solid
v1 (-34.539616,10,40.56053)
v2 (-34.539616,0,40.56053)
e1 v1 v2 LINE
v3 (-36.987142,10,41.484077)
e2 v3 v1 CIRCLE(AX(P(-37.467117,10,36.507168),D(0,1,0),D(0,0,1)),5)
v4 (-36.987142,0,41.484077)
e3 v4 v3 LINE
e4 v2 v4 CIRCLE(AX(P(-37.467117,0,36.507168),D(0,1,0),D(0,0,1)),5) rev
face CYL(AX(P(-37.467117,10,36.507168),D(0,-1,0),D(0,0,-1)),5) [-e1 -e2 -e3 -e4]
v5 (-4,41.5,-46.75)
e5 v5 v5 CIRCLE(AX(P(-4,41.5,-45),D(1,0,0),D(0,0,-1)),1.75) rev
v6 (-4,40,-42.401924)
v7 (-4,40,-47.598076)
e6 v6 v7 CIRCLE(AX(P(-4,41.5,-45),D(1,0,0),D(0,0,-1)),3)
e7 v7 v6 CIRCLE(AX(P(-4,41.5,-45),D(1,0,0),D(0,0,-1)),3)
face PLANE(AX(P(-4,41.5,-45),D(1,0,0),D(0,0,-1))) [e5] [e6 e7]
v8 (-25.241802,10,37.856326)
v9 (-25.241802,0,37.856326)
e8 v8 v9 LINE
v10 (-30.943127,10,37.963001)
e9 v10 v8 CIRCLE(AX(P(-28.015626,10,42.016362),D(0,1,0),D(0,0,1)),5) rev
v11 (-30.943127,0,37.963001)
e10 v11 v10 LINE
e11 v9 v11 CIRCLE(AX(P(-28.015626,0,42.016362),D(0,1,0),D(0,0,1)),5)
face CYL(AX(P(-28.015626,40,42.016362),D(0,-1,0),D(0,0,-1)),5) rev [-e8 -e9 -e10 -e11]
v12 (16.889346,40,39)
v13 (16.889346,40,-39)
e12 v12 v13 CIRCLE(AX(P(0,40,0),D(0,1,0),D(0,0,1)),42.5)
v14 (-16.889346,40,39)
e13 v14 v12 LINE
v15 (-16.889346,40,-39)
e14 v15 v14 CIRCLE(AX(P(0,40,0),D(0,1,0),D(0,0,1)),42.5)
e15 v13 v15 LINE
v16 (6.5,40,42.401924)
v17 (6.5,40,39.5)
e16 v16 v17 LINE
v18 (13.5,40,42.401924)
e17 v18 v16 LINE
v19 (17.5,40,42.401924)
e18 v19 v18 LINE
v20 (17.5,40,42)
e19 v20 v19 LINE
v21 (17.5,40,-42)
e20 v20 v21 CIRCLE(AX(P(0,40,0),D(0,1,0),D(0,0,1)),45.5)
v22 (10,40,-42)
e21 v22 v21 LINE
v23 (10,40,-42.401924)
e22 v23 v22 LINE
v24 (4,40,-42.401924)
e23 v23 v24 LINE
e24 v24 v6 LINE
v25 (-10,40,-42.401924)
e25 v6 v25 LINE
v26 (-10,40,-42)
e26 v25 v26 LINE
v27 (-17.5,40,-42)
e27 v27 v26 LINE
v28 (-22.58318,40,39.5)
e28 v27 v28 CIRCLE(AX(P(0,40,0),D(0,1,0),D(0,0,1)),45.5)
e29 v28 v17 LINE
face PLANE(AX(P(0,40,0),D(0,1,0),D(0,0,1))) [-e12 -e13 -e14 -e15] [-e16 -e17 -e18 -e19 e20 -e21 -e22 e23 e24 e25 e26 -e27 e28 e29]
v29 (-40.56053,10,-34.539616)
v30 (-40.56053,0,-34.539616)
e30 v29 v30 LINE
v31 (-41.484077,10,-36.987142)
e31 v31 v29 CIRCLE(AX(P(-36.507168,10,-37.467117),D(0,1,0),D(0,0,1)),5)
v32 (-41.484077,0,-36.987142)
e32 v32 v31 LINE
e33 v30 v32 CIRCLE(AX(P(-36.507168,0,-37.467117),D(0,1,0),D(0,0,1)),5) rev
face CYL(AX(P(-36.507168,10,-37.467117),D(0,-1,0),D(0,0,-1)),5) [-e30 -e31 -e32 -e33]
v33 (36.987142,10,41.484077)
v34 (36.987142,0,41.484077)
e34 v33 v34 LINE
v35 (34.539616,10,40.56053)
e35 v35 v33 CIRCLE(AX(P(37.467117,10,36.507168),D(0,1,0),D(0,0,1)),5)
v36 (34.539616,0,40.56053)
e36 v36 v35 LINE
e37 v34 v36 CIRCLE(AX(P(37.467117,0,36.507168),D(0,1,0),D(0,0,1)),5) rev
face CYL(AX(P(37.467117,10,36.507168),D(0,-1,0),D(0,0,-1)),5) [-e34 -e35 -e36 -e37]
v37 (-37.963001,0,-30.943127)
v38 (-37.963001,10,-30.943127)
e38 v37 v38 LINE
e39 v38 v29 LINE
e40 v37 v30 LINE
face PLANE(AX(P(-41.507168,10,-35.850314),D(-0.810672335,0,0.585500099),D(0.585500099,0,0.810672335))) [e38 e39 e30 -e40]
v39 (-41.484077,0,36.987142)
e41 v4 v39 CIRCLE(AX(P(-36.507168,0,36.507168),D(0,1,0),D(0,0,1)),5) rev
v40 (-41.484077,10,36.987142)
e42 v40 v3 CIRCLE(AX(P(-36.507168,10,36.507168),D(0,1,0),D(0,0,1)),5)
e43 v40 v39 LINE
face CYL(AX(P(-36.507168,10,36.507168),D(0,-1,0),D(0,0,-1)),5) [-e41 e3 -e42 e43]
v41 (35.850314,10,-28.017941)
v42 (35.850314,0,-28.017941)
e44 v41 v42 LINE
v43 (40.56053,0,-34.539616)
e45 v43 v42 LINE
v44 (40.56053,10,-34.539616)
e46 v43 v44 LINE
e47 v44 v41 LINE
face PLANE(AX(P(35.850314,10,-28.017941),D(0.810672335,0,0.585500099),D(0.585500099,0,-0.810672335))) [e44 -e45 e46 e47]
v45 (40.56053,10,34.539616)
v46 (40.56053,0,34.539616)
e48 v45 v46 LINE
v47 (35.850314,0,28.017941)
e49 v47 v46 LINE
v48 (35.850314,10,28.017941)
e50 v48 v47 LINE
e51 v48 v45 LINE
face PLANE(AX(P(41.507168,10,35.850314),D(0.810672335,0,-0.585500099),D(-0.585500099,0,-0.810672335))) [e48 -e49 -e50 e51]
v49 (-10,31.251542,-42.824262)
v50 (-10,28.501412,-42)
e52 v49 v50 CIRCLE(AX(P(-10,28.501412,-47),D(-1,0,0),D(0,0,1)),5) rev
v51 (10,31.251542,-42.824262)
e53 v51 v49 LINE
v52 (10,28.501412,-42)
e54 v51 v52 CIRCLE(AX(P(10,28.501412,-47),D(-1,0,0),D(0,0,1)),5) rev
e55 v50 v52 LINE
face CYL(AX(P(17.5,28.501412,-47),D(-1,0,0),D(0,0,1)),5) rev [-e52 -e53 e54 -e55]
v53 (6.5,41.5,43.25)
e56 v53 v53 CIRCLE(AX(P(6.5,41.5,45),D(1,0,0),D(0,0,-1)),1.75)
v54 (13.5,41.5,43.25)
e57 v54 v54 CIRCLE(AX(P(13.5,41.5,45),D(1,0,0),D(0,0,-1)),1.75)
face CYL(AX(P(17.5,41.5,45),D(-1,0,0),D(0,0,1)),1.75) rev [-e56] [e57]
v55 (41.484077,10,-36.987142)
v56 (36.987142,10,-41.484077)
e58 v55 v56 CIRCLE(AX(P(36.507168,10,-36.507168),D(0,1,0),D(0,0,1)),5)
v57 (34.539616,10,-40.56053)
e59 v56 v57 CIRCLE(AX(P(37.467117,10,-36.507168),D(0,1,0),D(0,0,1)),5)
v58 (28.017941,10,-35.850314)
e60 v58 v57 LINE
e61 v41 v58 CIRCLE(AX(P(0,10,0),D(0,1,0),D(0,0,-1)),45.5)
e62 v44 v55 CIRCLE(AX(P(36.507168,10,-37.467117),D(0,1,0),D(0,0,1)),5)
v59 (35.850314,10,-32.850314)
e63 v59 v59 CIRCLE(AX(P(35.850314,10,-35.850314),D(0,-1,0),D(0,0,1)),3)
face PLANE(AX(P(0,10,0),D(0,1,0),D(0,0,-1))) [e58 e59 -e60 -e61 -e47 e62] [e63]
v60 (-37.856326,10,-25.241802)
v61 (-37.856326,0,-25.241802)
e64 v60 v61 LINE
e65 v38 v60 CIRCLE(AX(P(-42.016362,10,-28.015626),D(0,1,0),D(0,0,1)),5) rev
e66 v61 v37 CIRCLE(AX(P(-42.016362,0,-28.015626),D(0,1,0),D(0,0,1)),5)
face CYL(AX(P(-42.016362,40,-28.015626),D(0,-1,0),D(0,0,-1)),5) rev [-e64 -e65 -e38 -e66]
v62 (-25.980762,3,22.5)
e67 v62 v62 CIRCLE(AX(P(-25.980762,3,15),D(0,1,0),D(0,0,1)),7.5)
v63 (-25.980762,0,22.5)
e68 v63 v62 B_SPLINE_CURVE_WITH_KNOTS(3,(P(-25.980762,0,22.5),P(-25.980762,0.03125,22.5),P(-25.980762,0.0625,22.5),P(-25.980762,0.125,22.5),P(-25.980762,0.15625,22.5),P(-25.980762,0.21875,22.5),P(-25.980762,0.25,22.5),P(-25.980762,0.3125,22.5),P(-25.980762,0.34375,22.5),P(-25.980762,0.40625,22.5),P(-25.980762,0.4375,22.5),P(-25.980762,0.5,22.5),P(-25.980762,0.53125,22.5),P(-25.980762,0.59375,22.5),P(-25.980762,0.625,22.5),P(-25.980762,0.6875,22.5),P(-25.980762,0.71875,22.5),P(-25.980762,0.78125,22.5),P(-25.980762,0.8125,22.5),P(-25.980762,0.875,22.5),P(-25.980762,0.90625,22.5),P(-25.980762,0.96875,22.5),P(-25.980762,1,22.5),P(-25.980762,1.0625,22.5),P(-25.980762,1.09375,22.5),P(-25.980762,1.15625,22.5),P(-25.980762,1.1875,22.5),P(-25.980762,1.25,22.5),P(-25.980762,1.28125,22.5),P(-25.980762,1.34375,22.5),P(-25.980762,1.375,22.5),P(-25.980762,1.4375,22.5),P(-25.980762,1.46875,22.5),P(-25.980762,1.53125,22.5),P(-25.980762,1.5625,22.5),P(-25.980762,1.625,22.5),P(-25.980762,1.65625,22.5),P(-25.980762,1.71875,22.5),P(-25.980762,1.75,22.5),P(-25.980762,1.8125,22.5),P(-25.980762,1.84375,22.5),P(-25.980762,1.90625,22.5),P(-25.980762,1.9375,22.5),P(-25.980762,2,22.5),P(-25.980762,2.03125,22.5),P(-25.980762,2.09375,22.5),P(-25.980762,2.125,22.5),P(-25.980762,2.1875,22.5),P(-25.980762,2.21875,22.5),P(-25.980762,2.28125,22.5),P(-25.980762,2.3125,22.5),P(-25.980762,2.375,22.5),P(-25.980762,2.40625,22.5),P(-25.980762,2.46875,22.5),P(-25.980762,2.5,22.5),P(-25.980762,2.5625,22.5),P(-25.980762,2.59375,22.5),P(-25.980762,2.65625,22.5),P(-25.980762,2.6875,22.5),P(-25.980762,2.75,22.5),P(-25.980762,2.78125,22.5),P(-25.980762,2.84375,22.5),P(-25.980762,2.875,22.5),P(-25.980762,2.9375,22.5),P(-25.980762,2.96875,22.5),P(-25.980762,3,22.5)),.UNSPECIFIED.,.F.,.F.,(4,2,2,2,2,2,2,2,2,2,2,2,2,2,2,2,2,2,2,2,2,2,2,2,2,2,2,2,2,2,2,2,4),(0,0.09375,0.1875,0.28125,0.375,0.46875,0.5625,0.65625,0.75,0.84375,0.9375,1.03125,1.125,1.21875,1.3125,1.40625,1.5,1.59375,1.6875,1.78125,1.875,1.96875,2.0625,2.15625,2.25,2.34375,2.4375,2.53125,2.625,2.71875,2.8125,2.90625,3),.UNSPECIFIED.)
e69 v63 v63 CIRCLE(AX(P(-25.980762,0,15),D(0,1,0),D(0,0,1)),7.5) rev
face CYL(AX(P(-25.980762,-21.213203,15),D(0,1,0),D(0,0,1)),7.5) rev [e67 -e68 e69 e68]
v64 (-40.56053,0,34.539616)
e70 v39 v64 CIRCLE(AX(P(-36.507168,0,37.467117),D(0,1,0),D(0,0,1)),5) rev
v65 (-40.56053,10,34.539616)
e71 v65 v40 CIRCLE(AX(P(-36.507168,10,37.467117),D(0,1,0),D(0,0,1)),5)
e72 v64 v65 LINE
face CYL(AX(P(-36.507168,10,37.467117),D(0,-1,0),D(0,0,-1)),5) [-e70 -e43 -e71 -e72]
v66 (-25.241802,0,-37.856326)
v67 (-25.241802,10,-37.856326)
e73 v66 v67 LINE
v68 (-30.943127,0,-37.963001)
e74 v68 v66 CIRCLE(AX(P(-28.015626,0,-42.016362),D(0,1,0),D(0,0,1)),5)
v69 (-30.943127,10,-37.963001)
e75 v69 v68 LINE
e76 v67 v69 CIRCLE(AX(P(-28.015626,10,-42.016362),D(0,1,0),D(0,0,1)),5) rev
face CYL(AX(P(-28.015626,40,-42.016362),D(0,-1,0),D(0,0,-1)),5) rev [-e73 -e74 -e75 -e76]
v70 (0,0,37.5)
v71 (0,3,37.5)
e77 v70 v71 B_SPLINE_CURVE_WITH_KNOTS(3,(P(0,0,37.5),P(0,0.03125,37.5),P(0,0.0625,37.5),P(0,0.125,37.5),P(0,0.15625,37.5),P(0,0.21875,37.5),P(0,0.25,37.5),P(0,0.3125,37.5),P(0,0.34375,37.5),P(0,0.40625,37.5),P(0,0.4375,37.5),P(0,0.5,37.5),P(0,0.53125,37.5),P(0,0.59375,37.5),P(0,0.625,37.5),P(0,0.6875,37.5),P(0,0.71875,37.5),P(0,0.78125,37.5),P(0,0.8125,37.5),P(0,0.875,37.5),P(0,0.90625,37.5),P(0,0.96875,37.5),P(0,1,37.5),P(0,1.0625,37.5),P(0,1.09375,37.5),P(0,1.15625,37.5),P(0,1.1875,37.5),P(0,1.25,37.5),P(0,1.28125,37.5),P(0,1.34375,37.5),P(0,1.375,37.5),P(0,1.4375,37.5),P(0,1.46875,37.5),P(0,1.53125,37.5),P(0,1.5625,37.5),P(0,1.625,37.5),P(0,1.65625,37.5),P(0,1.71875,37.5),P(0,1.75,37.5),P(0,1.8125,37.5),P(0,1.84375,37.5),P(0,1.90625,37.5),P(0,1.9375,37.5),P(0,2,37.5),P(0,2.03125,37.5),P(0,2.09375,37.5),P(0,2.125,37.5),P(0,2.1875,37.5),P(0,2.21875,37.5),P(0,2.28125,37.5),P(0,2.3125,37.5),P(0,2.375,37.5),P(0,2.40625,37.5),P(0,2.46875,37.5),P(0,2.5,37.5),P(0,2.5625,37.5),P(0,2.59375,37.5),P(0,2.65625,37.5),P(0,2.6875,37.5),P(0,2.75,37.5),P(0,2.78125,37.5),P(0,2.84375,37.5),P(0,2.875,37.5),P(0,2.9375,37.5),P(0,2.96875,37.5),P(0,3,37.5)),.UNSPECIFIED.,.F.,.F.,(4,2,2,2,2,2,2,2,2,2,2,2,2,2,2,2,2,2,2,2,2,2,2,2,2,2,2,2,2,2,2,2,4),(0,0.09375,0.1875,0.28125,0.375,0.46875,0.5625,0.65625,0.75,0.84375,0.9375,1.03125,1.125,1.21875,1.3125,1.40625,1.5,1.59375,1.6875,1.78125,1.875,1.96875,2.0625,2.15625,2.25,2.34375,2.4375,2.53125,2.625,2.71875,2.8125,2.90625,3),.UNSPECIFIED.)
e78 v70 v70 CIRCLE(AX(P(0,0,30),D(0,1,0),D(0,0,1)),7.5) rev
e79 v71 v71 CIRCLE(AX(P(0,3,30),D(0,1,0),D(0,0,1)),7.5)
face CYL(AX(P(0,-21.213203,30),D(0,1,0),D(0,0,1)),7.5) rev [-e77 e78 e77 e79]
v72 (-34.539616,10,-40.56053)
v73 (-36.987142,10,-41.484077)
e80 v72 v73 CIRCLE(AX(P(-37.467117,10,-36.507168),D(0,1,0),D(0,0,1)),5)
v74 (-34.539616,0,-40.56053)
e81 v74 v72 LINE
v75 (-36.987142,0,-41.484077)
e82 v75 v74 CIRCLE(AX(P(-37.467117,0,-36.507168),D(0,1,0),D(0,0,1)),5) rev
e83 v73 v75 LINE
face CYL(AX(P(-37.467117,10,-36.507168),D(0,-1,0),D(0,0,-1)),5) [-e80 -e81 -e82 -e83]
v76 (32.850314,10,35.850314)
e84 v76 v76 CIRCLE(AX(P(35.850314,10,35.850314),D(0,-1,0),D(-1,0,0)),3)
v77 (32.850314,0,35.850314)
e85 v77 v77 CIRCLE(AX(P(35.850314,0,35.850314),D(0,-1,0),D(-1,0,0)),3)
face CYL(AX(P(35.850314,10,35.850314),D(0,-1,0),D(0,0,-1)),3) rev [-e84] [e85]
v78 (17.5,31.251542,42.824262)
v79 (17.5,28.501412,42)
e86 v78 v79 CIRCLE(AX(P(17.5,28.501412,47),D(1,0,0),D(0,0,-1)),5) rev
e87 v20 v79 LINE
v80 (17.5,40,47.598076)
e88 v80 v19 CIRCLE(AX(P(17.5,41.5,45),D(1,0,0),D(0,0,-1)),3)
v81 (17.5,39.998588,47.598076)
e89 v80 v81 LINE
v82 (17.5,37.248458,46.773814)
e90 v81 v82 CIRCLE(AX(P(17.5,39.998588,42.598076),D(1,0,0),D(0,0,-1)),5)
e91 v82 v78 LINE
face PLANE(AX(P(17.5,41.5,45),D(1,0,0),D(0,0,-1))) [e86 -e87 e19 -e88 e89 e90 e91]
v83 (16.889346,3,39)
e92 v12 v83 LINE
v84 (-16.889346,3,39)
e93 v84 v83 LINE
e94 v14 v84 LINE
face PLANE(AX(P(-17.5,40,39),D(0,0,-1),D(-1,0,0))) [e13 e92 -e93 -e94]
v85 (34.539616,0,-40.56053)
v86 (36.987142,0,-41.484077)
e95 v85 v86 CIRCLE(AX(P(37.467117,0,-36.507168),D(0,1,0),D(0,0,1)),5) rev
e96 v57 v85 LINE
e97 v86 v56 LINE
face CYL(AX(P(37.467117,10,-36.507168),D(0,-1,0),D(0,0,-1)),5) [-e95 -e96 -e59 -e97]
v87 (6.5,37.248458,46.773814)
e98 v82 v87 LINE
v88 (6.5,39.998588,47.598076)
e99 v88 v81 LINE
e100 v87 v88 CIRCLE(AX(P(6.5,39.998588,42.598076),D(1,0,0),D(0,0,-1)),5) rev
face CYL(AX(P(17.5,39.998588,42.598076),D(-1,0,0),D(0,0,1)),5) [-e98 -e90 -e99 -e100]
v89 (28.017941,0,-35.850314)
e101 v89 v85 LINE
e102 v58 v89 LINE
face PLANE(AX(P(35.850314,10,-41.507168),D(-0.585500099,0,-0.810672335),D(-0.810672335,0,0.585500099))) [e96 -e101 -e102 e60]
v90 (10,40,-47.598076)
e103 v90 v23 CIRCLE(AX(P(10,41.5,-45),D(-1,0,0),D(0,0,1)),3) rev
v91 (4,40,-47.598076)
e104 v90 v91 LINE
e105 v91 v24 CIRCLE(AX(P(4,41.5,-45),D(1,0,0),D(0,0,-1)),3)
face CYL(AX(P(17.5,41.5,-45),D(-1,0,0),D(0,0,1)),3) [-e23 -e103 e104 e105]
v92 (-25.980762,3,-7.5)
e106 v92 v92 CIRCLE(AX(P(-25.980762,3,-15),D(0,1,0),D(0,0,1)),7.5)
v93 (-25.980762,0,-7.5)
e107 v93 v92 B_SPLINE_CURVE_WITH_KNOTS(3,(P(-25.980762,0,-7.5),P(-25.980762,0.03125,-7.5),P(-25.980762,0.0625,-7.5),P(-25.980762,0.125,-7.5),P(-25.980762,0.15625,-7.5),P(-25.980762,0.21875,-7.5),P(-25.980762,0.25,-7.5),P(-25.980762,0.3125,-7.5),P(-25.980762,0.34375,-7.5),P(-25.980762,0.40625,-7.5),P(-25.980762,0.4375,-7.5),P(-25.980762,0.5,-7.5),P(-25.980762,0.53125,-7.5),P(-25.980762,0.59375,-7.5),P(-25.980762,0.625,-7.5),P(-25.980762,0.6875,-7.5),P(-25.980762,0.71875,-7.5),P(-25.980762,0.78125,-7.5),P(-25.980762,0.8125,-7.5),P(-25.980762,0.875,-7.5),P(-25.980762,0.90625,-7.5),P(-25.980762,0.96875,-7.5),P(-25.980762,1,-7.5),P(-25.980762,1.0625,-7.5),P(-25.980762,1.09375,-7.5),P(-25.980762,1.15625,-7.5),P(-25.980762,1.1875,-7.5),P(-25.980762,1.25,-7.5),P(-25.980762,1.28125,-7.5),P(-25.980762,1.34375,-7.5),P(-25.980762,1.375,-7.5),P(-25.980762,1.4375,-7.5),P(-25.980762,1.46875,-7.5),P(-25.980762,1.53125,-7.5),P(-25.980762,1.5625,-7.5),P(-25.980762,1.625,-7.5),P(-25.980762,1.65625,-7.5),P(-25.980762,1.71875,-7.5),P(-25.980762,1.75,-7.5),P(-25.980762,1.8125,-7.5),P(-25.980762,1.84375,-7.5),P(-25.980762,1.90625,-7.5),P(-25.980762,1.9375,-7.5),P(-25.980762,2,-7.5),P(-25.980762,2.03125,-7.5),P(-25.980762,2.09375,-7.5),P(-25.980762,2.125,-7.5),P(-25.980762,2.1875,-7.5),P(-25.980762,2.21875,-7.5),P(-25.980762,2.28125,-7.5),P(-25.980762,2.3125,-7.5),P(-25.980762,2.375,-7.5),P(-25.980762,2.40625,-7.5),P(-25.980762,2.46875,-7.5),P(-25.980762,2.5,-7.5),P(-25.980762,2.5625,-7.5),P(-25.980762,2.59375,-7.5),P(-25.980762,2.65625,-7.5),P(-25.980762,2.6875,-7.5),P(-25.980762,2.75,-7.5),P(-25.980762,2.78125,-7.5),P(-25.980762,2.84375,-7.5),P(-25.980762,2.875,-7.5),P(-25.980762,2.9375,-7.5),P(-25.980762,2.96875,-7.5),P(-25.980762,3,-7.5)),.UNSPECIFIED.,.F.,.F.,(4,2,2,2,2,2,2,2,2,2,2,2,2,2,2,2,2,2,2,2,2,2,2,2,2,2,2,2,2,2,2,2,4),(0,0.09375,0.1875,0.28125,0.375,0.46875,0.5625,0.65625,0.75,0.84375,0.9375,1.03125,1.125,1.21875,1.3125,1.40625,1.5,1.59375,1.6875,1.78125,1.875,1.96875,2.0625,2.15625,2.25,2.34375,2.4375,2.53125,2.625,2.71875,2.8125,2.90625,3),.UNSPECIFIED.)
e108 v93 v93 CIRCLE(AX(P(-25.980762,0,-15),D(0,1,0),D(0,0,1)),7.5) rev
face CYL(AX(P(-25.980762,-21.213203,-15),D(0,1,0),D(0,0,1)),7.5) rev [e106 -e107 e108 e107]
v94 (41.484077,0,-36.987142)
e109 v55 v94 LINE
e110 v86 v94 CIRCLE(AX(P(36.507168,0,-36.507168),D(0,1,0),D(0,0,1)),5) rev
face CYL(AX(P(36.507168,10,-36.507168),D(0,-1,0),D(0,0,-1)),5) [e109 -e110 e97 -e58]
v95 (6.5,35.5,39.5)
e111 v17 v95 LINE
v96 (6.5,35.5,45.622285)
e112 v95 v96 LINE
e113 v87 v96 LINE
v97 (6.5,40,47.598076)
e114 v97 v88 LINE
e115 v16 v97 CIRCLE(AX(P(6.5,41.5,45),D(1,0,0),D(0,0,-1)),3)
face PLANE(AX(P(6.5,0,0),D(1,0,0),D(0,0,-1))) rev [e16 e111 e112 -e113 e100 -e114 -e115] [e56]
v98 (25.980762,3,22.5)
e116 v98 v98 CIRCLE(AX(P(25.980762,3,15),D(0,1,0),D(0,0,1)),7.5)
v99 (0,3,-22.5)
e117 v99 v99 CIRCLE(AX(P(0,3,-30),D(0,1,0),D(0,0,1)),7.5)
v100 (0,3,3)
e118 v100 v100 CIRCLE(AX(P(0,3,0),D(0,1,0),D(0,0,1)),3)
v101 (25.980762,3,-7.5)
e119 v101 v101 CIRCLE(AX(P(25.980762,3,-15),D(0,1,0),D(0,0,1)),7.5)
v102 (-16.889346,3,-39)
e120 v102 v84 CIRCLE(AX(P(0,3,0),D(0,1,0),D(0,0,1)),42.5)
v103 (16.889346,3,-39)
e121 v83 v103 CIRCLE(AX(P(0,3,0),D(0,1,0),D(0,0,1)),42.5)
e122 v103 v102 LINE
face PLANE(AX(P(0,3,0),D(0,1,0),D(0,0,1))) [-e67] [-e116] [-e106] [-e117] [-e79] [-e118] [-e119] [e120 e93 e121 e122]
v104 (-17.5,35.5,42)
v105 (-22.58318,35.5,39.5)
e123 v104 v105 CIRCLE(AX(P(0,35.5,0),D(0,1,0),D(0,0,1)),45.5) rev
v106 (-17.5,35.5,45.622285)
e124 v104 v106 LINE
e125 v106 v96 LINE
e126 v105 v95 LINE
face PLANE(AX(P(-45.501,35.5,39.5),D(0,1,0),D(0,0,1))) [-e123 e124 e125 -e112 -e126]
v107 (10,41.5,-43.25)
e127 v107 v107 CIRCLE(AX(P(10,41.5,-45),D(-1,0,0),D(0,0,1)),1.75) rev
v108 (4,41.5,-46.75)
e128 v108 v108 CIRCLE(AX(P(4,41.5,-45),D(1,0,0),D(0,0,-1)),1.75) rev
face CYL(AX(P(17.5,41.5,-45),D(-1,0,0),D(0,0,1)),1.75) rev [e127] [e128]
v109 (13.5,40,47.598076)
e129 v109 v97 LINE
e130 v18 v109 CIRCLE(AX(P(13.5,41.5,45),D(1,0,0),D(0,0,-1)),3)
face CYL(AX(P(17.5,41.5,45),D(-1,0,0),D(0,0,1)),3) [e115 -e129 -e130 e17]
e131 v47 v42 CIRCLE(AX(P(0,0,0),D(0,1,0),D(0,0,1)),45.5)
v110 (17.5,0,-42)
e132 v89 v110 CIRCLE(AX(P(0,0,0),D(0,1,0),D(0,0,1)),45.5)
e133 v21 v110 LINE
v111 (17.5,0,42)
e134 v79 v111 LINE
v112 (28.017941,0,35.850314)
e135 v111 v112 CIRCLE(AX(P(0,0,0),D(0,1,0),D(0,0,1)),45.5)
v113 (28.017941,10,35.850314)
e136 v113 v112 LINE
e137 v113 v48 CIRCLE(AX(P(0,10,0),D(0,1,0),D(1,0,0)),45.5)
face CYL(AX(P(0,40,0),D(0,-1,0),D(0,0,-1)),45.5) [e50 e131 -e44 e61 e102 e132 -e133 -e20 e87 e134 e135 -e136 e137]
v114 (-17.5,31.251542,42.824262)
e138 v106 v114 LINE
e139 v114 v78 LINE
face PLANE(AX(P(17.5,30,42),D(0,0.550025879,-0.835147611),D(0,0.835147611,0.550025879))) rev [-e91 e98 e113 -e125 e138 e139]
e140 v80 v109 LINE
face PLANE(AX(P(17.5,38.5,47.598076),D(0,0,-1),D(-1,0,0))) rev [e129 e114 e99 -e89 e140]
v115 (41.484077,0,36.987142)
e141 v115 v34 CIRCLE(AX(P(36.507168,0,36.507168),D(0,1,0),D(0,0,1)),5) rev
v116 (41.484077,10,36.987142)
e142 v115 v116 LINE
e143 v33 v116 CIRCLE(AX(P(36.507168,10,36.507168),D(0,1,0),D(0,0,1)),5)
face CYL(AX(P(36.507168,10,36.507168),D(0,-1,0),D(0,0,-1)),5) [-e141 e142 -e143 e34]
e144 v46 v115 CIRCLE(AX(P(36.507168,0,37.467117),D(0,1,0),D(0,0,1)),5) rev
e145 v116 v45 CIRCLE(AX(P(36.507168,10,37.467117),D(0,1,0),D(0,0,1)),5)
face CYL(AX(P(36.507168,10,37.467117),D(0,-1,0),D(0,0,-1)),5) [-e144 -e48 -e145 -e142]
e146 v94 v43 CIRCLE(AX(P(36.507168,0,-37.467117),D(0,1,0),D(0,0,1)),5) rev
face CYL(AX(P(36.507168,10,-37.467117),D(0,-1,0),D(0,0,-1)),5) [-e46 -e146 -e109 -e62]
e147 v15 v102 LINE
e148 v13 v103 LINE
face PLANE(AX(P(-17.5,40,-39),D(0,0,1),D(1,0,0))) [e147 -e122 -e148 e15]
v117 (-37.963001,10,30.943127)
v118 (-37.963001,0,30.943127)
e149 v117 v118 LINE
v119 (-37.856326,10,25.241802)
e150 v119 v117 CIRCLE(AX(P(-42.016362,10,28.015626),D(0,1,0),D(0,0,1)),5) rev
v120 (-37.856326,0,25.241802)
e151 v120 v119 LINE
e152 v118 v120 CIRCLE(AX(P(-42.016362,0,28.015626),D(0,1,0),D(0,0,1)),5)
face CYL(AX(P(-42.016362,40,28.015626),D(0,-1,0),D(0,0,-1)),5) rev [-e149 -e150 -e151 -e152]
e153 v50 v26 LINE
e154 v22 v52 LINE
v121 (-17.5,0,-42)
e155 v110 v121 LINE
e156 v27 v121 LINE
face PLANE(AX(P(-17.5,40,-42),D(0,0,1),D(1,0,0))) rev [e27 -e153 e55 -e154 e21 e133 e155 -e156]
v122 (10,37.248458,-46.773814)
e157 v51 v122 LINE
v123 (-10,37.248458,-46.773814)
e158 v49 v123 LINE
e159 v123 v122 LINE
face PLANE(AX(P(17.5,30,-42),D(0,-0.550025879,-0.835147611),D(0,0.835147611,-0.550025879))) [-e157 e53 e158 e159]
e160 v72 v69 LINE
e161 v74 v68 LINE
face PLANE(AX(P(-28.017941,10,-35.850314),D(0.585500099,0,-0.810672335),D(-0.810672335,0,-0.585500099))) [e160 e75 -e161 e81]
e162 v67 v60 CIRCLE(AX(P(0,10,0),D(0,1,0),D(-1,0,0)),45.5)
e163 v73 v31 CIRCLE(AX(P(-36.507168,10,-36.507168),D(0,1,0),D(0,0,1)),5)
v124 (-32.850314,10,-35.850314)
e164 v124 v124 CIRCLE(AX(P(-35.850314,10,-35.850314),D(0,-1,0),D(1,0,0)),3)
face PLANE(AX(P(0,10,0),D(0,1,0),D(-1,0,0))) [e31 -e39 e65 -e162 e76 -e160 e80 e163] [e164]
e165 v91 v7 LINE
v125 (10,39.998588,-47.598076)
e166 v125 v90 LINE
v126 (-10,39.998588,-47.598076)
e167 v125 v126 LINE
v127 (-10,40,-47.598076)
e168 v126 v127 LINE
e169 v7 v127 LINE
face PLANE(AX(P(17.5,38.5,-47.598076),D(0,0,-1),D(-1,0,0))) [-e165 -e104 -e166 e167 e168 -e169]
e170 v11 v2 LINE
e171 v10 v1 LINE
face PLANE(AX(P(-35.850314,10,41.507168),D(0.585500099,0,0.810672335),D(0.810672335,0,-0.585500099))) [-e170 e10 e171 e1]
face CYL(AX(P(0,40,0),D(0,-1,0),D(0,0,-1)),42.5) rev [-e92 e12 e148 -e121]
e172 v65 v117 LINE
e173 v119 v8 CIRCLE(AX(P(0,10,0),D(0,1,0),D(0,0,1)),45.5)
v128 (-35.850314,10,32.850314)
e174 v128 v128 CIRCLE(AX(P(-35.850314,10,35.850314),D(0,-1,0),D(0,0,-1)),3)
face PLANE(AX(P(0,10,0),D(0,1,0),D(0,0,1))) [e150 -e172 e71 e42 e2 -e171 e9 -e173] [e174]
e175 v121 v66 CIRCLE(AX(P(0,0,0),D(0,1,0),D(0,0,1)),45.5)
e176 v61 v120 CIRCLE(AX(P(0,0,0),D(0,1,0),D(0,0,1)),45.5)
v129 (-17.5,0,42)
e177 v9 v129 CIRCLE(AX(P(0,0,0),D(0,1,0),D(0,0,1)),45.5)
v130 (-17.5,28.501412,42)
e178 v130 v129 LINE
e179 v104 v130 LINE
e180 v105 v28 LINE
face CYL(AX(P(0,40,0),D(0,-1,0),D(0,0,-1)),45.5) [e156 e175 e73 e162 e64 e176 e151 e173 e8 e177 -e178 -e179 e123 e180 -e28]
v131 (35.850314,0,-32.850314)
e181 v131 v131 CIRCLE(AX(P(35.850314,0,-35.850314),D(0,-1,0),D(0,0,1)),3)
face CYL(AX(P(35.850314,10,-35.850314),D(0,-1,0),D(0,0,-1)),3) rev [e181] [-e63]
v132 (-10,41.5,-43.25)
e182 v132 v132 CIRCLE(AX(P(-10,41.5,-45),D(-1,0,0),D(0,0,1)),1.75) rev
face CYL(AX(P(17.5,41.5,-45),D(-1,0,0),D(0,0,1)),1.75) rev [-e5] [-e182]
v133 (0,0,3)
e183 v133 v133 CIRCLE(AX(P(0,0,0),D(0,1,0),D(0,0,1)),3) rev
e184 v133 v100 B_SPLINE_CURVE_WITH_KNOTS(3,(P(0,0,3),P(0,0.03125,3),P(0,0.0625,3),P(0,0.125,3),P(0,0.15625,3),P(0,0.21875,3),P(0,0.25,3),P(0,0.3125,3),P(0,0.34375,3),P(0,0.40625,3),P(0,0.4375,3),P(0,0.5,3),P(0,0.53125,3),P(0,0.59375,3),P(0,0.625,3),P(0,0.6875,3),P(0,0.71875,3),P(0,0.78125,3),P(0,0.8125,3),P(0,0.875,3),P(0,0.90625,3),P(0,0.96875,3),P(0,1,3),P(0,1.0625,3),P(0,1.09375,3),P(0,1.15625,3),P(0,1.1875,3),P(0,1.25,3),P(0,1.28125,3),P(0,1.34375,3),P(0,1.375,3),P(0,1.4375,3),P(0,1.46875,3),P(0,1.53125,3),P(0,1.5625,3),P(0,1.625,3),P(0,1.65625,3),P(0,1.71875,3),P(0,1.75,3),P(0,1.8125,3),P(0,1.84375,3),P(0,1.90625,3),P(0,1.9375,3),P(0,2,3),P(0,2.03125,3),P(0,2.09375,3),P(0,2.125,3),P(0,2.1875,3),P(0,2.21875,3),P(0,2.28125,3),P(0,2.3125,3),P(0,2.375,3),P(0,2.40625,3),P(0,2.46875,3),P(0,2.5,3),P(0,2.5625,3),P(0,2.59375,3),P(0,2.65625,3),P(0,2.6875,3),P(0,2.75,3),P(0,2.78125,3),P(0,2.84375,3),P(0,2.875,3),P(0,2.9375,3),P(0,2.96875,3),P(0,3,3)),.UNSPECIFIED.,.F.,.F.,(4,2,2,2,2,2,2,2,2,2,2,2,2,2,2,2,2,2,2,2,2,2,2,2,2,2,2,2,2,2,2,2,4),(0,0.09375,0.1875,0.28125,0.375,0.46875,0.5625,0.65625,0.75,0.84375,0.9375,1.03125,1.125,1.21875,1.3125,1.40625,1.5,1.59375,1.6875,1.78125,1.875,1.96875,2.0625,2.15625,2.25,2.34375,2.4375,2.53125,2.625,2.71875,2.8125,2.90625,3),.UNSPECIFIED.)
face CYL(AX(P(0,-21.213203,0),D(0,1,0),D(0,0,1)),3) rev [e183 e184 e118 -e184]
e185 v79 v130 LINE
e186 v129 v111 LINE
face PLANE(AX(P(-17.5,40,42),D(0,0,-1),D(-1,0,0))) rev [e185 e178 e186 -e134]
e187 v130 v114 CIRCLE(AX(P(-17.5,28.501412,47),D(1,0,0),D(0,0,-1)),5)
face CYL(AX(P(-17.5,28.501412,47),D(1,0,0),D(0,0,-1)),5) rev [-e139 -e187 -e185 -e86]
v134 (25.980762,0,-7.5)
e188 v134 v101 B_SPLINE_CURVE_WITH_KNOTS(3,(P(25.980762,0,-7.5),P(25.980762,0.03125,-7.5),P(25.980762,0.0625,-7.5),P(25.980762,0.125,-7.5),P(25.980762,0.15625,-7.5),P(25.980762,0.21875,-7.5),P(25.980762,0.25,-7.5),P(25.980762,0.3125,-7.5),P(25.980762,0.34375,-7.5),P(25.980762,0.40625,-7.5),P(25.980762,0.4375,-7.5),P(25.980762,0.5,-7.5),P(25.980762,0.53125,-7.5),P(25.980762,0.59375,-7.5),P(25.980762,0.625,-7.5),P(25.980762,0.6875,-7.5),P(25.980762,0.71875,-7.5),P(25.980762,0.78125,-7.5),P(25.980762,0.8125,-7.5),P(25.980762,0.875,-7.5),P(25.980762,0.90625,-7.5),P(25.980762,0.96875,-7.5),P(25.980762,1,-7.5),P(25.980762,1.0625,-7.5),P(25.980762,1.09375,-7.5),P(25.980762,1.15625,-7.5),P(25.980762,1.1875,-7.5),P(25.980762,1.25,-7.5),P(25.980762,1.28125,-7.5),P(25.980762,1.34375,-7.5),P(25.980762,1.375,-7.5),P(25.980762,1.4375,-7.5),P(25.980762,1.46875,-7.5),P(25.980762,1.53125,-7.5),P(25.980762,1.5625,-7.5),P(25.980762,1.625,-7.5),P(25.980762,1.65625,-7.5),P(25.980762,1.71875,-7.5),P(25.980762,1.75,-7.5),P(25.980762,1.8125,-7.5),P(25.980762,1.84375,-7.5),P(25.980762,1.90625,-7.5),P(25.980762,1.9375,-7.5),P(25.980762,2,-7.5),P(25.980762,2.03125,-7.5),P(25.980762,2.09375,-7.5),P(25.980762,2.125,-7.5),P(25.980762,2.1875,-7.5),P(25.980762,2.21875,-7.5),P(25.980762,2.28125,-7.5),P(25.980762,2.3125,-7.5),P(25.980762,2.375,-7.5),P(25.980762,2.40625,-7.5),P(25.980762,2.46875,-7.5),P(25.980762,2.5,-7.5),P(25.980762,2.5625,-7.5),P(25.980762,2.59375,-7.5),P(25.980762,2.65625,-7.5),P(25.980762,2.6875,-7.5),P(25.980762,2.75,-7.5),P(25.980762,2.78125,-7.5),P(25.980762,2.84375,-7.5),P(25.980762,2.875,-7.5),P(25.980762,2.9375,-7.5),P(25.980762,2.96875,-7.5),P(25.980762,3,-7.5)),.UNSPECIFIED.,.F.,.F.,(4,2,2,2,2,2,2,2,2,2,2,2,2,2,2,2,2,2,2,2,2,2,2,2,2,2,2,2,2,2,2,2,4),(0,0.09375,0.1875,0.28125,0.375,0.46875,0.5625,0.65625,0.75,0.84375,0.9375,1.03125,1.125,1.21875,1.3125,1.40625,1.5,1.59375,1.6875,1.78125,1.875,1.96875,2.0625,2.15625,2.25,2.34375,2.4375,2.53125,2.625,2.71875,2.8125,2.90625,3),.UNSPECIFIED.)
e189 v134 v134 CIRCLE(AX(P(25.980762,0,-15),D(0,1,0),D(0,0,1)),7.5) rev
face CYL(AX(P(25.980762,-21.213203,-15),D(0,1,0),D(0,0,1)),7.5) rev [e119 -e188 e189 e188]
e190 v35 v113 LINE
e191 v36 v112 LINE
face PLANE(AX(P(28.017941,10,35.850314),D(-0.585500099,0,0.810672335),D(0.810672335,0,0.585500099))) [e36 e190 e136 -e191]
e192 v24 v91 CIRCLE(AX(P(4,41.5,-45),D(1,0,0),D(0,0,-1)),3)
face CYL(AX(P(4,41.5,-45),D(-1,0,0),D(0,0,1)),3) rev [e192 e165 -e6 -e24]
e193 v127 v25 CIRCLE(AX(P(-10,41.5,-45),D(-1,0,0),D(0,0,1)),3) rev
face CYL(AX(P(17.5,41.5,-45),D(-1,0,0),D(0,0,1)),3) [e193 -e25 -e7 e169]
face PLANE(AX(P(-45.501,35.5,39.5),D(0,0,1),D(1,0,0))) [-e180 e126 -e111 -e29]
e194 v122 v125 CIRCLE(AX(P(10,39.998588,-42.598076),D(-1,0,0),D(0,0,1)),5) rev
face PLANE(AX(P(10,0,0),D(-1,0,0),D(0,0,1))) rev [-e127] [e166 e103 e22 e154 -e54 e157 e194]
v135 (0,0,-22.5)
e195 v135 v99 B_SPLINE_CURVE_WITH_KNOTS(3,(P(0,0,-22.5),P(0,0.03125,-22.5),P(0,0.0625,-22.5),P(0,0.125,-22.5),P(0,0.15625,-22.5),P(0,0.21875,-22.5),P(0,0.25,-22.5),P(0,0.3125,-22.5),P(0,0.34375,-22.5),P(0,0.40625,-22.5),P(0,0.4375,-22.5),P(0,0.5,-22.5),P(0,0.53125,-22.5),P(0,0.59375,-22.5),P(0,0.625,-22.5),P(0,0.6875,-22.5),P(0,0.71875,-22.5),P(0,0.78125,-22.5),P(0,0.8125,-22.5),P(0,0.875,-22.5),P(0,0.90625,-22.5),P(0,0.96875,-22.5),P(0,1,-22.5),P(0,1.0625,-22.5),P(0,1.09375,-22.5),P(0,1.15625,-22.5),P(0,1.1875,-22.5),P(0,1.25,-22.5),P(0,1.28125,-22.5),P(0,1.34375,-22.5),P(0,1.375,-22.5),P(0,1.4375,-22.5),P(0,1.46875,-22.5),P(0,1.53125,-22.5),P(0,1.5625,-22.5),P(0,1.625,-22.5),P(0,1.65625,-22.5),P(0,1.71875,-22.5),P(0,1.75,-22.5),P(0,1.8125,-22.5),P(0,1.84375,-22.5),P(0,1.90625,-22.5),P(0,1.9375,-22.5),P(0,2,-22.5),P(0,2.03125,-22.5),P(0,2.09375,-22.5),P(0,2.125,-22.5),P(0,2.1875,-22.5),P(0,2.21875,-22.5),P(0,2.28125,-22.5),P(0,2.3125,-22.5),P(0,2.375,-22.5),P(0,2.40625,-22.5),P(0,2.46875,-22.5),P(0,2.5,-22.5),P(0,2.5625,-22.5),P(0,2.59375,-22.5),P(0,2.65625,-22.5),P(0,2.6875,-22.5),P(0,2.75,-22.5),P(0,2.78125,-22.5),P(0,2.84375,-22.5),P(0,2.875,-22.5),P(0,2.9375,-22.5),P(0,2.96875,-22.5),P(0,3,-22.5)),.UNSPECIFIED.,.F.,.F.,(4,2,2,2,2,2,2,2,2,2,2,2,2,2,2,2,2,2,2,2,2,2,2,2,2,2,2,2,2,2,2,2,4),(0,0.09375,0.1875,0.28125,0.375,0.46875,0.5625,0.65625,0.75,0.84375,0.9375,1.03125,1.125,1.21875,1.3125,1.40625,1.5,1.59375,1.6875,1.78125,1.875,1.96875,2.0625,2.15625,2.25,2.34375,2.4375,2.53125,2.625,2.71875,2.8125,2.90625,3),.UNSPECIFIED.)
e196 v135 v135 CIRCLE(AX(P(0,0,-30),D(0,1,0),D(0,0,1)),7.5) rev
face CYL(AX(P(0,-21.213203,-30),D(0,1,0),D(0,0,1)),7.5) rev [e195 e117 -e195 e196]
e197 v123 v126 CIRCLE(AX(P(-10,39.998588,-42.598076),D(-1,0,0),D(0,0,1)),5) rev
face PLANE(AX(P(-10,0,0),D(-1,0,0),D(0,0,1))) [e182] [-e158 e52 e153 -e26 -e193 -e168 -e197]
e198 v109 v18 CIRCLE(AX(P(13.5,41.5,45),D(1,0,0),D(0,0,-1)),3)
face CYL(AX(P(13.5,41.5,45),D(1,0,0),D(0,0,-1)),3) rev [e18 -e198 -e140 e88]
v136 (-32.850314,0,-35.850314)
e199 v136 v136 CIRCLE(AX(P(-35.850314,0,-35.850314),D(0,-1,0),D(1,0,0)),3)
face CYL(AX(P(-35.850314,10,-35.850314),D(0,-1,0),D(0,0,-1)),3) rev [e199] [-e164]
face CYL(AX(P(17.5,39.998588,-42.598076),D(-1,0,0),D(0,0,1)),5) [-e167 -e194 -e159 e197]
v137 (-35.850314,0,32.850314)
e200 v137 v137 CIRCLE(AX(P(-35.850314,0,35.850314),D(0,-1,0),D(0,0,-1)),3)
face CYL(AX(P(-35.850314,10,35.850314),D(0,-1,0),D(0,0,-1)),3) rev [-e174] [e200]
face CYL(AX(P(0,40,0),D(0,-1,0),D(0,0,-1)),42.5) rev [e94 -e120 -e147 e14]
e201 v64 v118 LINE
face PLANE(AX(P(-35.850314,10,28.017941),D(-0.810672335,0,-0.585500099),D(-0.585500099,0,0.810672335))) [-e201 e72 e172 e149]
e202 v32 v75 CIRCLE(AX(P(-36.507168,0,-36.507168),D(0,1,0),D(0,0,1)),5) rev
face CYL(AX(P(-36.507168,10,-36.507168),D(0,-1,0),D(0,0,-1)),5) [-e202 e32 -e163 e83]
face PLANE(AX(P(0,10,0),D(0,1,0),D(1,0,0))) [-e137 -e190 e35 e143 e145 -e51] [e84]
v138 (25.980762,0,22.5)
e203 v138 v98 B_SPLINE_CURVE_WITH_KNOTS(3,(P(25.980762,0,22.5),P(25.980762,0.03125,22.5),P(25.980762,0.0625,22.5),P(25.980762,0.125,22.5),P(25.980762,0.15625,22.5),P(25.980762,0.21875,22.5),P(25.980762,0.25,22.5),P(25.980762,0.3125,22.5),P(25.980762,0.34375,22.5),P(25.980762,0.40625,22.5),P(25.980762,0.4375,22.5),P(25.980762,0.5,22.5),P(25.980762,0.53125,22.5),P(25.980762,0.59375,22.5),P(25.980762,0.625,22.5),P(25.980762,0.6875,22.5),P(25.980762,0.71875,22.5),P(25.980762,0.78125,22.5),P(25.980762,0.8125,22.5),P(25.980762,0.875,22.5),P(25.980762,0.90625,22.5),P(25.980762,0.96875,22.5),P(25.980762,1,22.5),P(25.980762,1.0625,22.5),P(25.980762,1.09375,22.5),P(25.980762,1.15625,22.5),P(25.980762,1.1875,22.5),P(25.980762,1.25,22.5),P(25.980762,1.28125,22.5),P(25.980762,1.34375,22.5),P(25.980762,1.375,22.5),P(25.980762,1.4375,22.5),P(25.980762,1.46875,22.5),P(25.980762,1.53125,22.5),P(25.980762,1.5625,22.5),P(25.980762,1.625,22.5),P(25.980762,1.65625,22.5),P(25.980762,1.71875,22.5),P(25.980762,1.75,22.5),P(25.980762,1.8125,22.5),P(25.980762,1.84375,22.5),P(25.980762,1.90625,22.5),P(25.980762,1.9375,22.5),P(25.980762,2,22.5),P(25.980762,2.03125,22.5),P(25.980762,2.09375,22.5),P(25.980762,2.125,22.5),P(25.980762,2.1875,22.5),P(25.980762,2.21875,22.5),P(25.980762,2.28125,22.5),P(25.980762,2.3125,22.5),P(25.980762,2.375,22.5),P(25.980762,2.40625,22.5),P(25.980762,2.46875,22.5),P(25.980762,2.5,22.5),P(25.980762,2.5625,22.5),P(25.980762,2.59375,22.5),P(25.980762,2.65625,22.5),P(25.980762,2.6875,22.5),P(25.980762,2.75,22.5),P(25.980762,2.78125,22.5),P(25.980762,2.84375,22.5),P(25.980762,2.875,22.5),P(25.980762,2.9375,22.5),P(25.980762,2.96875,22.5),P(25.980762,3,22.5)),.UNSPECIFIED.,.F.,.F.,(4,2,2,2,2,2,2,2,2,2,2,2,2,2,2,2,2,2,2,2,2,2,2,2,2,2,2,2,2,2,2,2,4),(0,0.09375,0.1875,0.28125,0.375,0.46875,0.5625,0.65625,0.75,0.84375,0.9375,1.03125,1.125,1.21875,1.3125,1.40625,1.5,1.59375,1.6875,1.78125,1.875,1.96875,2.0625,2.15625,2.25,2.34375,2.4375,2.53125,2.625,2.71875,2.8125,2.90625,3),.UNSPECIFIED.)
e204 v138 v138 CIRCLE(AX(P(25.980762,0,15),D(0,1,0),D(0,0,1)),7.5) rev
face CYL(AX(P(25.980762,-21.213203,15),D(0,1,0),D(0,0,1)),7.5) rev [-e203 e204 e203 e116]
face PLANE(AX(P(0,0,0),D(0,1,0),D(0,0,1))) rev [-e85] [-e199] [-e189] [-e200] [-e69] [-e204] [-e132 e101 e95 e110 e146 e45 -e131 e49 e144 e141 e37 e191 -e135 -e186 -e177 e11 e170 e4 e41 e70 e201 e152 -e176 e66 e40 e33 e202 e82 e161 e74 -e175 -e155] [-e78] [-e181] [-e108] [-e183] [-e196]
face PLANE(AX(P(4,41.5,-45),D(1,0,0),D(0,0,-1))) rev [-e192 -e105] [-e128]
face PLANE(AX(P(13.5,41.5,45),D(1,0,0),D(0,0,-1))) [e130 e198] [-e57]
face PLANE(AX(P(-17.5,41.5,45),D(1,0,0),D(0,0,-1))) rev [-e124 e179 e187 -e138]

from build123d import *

# Parameters (mm, degrees)
BOSS_EXTRUDE1_DEPTH            = 40
SHELL1_T                       = -3
SKETCH2_R                      = 3
SKETCH2_R_2                    = 7.5
CUT_EXTRUDE1_DEPTH             = 3
SKETCH3_R                      = 3
BOSS_EXTRUDE2_DEPTH            = 10
FILLET1_R                      = 5
CIRPATTERN1_OUTLINE_R          = 3
CIRPATTERN1_DEPTH              = 10
SKETCH4_R                      = 1.75
BOSS_EXTRUDE3_DEPTH            = 17.5
FILLET2_R                      = 5
FILLET3_R                      = 5
SKETCH5_R                      = 3
CUT_EXTRUDE2_DEPTH             = 4
CUT_EXTRUDE3_DEPTH             = 4
CUT_EXTRUDE3_DEPTH_BACK        = 4
SKETCH6_R                      = 3
SKETCH7_W                      = 10
SKETCH7_H                      = 20
CUT_EXTRUDE4_DEPTH             = 7.5
SKETCH9_W                      = 10
SKETCH9_H                      = 25
CUT_EXTRUDE6_DEPTH             = 7.5
SKETCH8_W                      = 11
SKETCH8_H                      = 12
CUT_EXTRUDE7_DEPTH             = 24
CUT_EXTRUDE7_DIRECTION_2_REACH = 92.847


# Read off the part's stored shape, not the designer's step: CirPattern1
with BuildPart() as part:
    # Sketch1 → Boss-Extrude1 (new body)
    with BuildSketch(Plane(origin=(0, 0, 0), x_dir=(1, 0, 0), z_dir=(0, 1, 0))):
        with BuildLine():
            Line((-17.5, 42), (17.5, 42))
            ThreePointArc((17.5, 42), (45.5, 0), (17.5, -42))
            Line((17.5, -42), (-17.5, -42))
            ThreePointArc((-17.5, -42), (-45.5, 0), (-17.5, 42))
        make_face()
    extrude(amount=BOSS_EXTRUDE1_DEPTH)

    # Shell1
    shell1_openings = [part.faces().sort_by_distance(p)[0] for p in [
        (0, 40, 0),
    ]]
    offset(amount=SHELL1_T, openings=shell1_openings, kind=Kind.INTERSECTION)

    # Sketch2 → Cut-Extrude1 (cut)
    with BuildSketch(Plane(origin=(0, 3, 0), x_dir=(1, 0, 0), z_dir=(0, 1, 0))):
        with Locations(Location((0, 0, 0), (0, 0, 270))):
            Circle(SKETCH2_R)
        with Locations(Location((0, 30, 0), (0, 0, 270))):
            Circle(SKETCH2_R_2)
        with Locations(Location((25.980762114, 15, 0), (0, 0, 270))):
            Circle(SKETCH2_R_2)
        with Locations(Location((25.980762114, -15, 0), (0, 0, 270))):
            Circle(SKETCH2_R_2)
        with Locations(Location((0, -30, 0), (0, 0, 270))):
            Circle(SKETCH2_R_2)
        with Locations(Location((-25.980762114, -15, 0), (0, 0, 270))):
            Circle(SKETCH2_R_2)
        with Locations(Location((-25.980762114, 15, 0), (0, 0, 270))):
            Circle(SKETCH2_R_2)
    extrude(amount=-CUT_EXTRUDE1_DEPTH, mode=Mode.SUBTRACT)

    # Sketch3 → Boss-Extrude2 (add)
    with BuildSketch(Plane.XZ):
        with BuildLine():
            Line((-35.850313806, 28.017940681), (-41.507168056, 35.850313806))
            Line((-41.507168056, 35.850313806), (-41.507168056, 41.507168056))
            Line((-41.507168056, 41.507168056), (-35.850313806, 41.507168056))
            Line((-35.850313806, 41.507168056), (-28.017940681, 35.850313806))
            ThreePointArc((-28.017940681, 35.850313806), (-32.173358544, 32.173358544), (-35.850313806, 28.017940681))
        make_face()
        with Locations(Location((-35.850313806, 35.850313806, 0), (0, 0, 270))):
            Circle(SKETCH3_R, mode=Mode.SUBTRACT)
    extrude(amount=-BOSS_EXTRUDE2_DEPTH)

    # Fillet1
    # the kernel refuses this fillet: 5 mm, written as the material it adds along each edge
    with BuildSketch(Plane(origin=(-28.017940681, 0, 35.850313806), x_dir=(0.8105373937900577, 0, 0.585686890128182), z_dir=(0, 1, 0))) as fillet1_piece_1:
        with BuildLine():
            CenterArc((3.613249721, -4.996457194), FILLET1_R, 92.157009058, 69.532849002)
            Line((-1.133599694, -3.425654648), (0, 0))
            ThreePointArc((0, 0), (1.712529816, -0.032239536), (3.425059631, 0))
        make_face()
    extrude(amount=10)
    with BuildSketch(Plane(origin=(-35.850313806, 0, 28.017940681), x_dir=(-0.5856868901281832, 0, -0.8105373937900566), z_dir=(0, 1, 0))) as fillet1_piece_2:
        with BuildLine():
            CenterArc((3.613249721, 4.996457194), FILLET1_R, 198.31014194, 69.532849002)
            Line((-1.133599694, 3.425654648), (0, 0))
            ThreePointArc((0, 0), (1.712529816, 0.032239536), (3.425059631, 0))
        make_face()
    extrude(amount=10)
    # the kernel refuses this fillet: 5 mm, written as the material it takes off along each edge
    with BuildSketch(Plane(origin=(-41.507168056, -12.5, 41.507168056), x_dir=(1, 0, 0), z_dir=(0, 1, 0))) as fillet1_2_piece_1:
        with BuildLine():
            CenterArc((FILLET1_R, FILLET1_R), FILLET1_R, 180, 90)
            Line((0, FILLET1_R), (0, 0))
            Line((0, 0), (FILLET1_R, 0))
        make_face()
    extrude(amount=35, mode=Mode.SUBTRACT)
    with BuildSketch(Plane(origin=(-35.850313806, -4.042007545, 41.507168056), x_dir=(0.8106723345515203, 0, -0.5855000990544645), z_dir=(0, 1, 0)), Plane(origin=(-41.507168056, -4.042007545, 35.850313806), x_dir=(0, 0, 1), z_dir=(0, 1, 0))) as fillet1_2_piece_2:
        with BuildLine():
            CenterArc((FILLET1_R * 0.323360603618, FILLET1_R), FILLET1_R, 234.161672423, 35.838327577)
            Line((-FILLET1_R * 0.262139495437, FILLET1_R * 0.189327665448), (0, 0))
            Line((0, 0), (FILLET1_R * 0.323360603618, 0))
        make_face()
    extrude(amount=18.08401509, mode=Mode.SUBTRACT)

    # CirPattern1 outline → CirPattern1 (add)
    # profile 1 of 3: a face of its own
    with BuildSketch(Plane(origin=(0, 0, 0), x_dir=(1, 0, 0), z_dir=(0, 1, 0))):
        with BuildLine():
            ThreePointArc((35.850313806, -28.017940681), (32.173358544, -32.173358544), (28.017940681, -35.850313806))
            Line((28.017940681, -35.850313806), (34.539616329, -40.560529728))
            ThreePointArc((34.539616329, -40.560529728), (35.701909685, -41.185206507), (36.98714244, -41.484077196))
            ThreePointArc((36.98714244, -41.484077196), (40.042701962, -40.042701962), (41.484077196, -36.98714244))
            ThreePointArc((41.484077196, -36.98714244), (41.185206507, -35.701909685), (40.560529728, -34.539616329))
            Line((40.560529728, -34.539616329), (35.850313806, -28.017940681))
        make_face()
        with Locations((35.850313806, -35.850313806)):
            Circle(CIRPATTERN1_OUTLINE_R, mode=Mode.SUBTRACT)
    # profile 2 of 3: a face of its own
    with BuildSketch(Plane(origin=(0, 0, 0), x_dir=(1, 0, 0), z_dir=(0, 1, 0))):
        with BuildLine():
            ThreePointArc((28.017940681, 35.850313806), (32.173358544, 32.173358544), (35.850313806, 28.017940681))
            Line((35.850313806, 28.017940681), (40.560529728, 34.539616329))
            ThreePointArc((40.560529728, 34.539616329), (41.185206507, 35.701909685), (41.484077196, 36.98714244))
            ThreePointArc((41.484077196, 36.98714244), (40.042701962, 40.042701962), (36.98714244, 41.484077196))
            ThreePointArc((36.98714244, 41.484077196), (35.701909685, 41.185206507), (34.539616329, 40.560529728))
            Line((34.539616329, 40.560529728), (28.017940681, 35.850313806))
        make_face()
        with Locations((35.850313806, 35.850313806)):
            Circle(CIRPATTERN1_OUTLINE_R, mode=Mode.SUBTRACT)
    # profile 3 of 3: a face of its own
    with BuildSketch(Plane(origin=(0, 0, 0), x_dir=(1, 0, 0), z_dir=(0, 1, 0))):
        with BuildLine():
            ThreePointArc((-25.241801774, 37.85632633), (-28.109161878, 37.01723716), (-30.94312664, 37.963000518))
            Line((-30.94312664, 37.963000518), (-34.539616329, 40.560529728))
            ThreePointArc((-34.539616329, 40.560529728), (-35.701909685, 41.185206507), (-36.98714244, 41.484077196))
            ThreePointArc((-36.98714244, 41.484077196), (-40.042701962, 40.042701962), (-41.484077196, 36.98714244))
            ThreePointArc((-41.484077196, 36.98714244), (-41.185206507, 35.701909685), (-40.560529728, 34.539616329))
            Line((-40.560529728, 34.539616329), (-37.963000518, 30.94312664))
            ThreePointArc((-37.963000518, 30.94312664), (-37.01723716, 28.109161878), (-37.85632633, 25.241801774))
            ThreePointArc((-37.85632633, 25.241801774), (-32.173358544, 32.173358544), (-25.241801774, 37.85632633))
        make_face()
        with Locations((-35.850313806, 35.850313806)):
            Circle(CIRPATTERN1_OUTLINE_R, mode=Mode.SUBTRACT)
    extrude(amount=CIRPATTERN1_DEPTH)

    # Sketch4 → Boss-Extrude3 (add, symmetric)
    with BuildSketch(Plane(origin=(0, 0, 0), x_dir=(0, 0, -1), z_dir=(1, 0, 0))):
        with BuildLine():
            Line((-42, 30), (-47.598076211, 38.5))
            Line((-47.598076211, 38.5), (-47.598076211, 40))
            ThreePointArc((-47.598076211, 40), (-45, 44.5), (-42.401923789, 40))
            Line((-42.401923789, 40), (-42, 40))
            Line((-42, 40), (-42, 30))
        make_face()
        with Locations((-45, 41.5)):
            Circle(SKETCH4_R, mode=Mode.SUBTRACT)
    boss_extrude3 = extrude(amount=BOSS_EXTRUDE3_DEPTH, both=True)

    # Fillet2
    fillet2_edges = [part.edges().sort_by_distance(p)[0] for p in [
        (0, 30, 42),
        (0, 38.5, 47.598076211),
    ]]
    fillet(fillet2_edges, radius=FILLET2_R)

    # Mirror1: Boss-Extrude3 across plane
    add(boss_extrude3.mirror(Plane.XY))

    # Fillet3
    fillet3_edges = [part.edges().sort_by_distance(p)[0] for p in [
        (0, 30, -42),
        (0, 38.5, -47.598076211),
    ]]
    fillet(fillet3_edges, radius=FILLET3_R)

    # Sketch5 → Cut-Extrude2 (cut)
    with BuildSketch(Plane(origin=(17.5, 0, 0), x_dir=(0, 0, -1), z_dir=(1, 0, 0))):
        with Locations((-45, 41.5)):
            Circle(SKETCH5_R)
    extrude(amount=-CUT_EXTRUDE2_DEPTH, mode=Mode.SUBTRACT)

    # Sketch6 → Cut-Extrude3 (cut, two sides: drawn at the far end of the back side and taken through both)
    with BuildSketch(Plane(origin=(0, 0, 0), x_dir=(0, 0, -1), z_dir=(1, 0, 0)).offset(-CUT_EXTRUDE3_DEPTH_BACK)):
        with Locations((45, 41.5)):
            Circle(SKETCH6_R)
    extrude(amount=CUT_EXTRUDE3_DEPTH + CUT_EXTRUDE3_DEPTH_BACK, mode=Mode.SUBTRACT)

    # Sketch7 → Cut-Extrude4 (cut)
    with BuildSketch(Plane.ZY.offset(17.5)):
        with Locations((-47, 38.501412431)):
            Rectangle(SKETCH7_W, SKETCH7_H)
    extrude(amount=-CUT_EXTRUDE4_DEPTH, mode=Mode.SUBTRACT)

    # Sketch9 → Cut-Extrude6 (cut)
    with BuildSketch(Plane(origin=(17.5, 0, 0), x_dir=(0, 0, -1), z_dir=(1, 0, 0))):
        with Locations((47, 38.001412431)):
            Rectangle(SKETCH9_W, SKETCH9_H)
    extrude(amount=-CUT_EXTRUDE6_DEPTH, mode=Mode.SUBTRACT)

    # Sketch8 → Cut-Extrude7 (cut)
    with BuildSketch(Plane.ZY.offset(17.5)):
        with Locations((45, 41.5)):
            Rectangle(SKETCH8_W, SKETCH8_H)
    extrude(amount=-CUT_EXTRUDE7_DEPTH, mode=Mode.SUBTRACT)

    # Sketch8 → Cut-Extrude7 direction 2 (cut, up to next)
    with BuildSketch(Plane.ZY.offset(17.5), mode=Mode.PRIVATE) as cut_extrude7_direction_2_sk1:
        with Locations((45, 41.5)):
            Rectangle(SKETCH8_W, SKETCH8_H)
    cut_extrude7_direction_2_tool1 = extrude(cut_extrude7_direction_2_sk1.sketch, amount=CUT_EXTRUDE7_DIRECTION_2_REACH, mode=Mode.PRIVATE) & part.part
    add(cut_extrude7_direction_2_tool1.solids().sort_by_distance((-17.5, 41.5, 45))[0], mode=Mode.SUBTRACT)


solid = part.part
